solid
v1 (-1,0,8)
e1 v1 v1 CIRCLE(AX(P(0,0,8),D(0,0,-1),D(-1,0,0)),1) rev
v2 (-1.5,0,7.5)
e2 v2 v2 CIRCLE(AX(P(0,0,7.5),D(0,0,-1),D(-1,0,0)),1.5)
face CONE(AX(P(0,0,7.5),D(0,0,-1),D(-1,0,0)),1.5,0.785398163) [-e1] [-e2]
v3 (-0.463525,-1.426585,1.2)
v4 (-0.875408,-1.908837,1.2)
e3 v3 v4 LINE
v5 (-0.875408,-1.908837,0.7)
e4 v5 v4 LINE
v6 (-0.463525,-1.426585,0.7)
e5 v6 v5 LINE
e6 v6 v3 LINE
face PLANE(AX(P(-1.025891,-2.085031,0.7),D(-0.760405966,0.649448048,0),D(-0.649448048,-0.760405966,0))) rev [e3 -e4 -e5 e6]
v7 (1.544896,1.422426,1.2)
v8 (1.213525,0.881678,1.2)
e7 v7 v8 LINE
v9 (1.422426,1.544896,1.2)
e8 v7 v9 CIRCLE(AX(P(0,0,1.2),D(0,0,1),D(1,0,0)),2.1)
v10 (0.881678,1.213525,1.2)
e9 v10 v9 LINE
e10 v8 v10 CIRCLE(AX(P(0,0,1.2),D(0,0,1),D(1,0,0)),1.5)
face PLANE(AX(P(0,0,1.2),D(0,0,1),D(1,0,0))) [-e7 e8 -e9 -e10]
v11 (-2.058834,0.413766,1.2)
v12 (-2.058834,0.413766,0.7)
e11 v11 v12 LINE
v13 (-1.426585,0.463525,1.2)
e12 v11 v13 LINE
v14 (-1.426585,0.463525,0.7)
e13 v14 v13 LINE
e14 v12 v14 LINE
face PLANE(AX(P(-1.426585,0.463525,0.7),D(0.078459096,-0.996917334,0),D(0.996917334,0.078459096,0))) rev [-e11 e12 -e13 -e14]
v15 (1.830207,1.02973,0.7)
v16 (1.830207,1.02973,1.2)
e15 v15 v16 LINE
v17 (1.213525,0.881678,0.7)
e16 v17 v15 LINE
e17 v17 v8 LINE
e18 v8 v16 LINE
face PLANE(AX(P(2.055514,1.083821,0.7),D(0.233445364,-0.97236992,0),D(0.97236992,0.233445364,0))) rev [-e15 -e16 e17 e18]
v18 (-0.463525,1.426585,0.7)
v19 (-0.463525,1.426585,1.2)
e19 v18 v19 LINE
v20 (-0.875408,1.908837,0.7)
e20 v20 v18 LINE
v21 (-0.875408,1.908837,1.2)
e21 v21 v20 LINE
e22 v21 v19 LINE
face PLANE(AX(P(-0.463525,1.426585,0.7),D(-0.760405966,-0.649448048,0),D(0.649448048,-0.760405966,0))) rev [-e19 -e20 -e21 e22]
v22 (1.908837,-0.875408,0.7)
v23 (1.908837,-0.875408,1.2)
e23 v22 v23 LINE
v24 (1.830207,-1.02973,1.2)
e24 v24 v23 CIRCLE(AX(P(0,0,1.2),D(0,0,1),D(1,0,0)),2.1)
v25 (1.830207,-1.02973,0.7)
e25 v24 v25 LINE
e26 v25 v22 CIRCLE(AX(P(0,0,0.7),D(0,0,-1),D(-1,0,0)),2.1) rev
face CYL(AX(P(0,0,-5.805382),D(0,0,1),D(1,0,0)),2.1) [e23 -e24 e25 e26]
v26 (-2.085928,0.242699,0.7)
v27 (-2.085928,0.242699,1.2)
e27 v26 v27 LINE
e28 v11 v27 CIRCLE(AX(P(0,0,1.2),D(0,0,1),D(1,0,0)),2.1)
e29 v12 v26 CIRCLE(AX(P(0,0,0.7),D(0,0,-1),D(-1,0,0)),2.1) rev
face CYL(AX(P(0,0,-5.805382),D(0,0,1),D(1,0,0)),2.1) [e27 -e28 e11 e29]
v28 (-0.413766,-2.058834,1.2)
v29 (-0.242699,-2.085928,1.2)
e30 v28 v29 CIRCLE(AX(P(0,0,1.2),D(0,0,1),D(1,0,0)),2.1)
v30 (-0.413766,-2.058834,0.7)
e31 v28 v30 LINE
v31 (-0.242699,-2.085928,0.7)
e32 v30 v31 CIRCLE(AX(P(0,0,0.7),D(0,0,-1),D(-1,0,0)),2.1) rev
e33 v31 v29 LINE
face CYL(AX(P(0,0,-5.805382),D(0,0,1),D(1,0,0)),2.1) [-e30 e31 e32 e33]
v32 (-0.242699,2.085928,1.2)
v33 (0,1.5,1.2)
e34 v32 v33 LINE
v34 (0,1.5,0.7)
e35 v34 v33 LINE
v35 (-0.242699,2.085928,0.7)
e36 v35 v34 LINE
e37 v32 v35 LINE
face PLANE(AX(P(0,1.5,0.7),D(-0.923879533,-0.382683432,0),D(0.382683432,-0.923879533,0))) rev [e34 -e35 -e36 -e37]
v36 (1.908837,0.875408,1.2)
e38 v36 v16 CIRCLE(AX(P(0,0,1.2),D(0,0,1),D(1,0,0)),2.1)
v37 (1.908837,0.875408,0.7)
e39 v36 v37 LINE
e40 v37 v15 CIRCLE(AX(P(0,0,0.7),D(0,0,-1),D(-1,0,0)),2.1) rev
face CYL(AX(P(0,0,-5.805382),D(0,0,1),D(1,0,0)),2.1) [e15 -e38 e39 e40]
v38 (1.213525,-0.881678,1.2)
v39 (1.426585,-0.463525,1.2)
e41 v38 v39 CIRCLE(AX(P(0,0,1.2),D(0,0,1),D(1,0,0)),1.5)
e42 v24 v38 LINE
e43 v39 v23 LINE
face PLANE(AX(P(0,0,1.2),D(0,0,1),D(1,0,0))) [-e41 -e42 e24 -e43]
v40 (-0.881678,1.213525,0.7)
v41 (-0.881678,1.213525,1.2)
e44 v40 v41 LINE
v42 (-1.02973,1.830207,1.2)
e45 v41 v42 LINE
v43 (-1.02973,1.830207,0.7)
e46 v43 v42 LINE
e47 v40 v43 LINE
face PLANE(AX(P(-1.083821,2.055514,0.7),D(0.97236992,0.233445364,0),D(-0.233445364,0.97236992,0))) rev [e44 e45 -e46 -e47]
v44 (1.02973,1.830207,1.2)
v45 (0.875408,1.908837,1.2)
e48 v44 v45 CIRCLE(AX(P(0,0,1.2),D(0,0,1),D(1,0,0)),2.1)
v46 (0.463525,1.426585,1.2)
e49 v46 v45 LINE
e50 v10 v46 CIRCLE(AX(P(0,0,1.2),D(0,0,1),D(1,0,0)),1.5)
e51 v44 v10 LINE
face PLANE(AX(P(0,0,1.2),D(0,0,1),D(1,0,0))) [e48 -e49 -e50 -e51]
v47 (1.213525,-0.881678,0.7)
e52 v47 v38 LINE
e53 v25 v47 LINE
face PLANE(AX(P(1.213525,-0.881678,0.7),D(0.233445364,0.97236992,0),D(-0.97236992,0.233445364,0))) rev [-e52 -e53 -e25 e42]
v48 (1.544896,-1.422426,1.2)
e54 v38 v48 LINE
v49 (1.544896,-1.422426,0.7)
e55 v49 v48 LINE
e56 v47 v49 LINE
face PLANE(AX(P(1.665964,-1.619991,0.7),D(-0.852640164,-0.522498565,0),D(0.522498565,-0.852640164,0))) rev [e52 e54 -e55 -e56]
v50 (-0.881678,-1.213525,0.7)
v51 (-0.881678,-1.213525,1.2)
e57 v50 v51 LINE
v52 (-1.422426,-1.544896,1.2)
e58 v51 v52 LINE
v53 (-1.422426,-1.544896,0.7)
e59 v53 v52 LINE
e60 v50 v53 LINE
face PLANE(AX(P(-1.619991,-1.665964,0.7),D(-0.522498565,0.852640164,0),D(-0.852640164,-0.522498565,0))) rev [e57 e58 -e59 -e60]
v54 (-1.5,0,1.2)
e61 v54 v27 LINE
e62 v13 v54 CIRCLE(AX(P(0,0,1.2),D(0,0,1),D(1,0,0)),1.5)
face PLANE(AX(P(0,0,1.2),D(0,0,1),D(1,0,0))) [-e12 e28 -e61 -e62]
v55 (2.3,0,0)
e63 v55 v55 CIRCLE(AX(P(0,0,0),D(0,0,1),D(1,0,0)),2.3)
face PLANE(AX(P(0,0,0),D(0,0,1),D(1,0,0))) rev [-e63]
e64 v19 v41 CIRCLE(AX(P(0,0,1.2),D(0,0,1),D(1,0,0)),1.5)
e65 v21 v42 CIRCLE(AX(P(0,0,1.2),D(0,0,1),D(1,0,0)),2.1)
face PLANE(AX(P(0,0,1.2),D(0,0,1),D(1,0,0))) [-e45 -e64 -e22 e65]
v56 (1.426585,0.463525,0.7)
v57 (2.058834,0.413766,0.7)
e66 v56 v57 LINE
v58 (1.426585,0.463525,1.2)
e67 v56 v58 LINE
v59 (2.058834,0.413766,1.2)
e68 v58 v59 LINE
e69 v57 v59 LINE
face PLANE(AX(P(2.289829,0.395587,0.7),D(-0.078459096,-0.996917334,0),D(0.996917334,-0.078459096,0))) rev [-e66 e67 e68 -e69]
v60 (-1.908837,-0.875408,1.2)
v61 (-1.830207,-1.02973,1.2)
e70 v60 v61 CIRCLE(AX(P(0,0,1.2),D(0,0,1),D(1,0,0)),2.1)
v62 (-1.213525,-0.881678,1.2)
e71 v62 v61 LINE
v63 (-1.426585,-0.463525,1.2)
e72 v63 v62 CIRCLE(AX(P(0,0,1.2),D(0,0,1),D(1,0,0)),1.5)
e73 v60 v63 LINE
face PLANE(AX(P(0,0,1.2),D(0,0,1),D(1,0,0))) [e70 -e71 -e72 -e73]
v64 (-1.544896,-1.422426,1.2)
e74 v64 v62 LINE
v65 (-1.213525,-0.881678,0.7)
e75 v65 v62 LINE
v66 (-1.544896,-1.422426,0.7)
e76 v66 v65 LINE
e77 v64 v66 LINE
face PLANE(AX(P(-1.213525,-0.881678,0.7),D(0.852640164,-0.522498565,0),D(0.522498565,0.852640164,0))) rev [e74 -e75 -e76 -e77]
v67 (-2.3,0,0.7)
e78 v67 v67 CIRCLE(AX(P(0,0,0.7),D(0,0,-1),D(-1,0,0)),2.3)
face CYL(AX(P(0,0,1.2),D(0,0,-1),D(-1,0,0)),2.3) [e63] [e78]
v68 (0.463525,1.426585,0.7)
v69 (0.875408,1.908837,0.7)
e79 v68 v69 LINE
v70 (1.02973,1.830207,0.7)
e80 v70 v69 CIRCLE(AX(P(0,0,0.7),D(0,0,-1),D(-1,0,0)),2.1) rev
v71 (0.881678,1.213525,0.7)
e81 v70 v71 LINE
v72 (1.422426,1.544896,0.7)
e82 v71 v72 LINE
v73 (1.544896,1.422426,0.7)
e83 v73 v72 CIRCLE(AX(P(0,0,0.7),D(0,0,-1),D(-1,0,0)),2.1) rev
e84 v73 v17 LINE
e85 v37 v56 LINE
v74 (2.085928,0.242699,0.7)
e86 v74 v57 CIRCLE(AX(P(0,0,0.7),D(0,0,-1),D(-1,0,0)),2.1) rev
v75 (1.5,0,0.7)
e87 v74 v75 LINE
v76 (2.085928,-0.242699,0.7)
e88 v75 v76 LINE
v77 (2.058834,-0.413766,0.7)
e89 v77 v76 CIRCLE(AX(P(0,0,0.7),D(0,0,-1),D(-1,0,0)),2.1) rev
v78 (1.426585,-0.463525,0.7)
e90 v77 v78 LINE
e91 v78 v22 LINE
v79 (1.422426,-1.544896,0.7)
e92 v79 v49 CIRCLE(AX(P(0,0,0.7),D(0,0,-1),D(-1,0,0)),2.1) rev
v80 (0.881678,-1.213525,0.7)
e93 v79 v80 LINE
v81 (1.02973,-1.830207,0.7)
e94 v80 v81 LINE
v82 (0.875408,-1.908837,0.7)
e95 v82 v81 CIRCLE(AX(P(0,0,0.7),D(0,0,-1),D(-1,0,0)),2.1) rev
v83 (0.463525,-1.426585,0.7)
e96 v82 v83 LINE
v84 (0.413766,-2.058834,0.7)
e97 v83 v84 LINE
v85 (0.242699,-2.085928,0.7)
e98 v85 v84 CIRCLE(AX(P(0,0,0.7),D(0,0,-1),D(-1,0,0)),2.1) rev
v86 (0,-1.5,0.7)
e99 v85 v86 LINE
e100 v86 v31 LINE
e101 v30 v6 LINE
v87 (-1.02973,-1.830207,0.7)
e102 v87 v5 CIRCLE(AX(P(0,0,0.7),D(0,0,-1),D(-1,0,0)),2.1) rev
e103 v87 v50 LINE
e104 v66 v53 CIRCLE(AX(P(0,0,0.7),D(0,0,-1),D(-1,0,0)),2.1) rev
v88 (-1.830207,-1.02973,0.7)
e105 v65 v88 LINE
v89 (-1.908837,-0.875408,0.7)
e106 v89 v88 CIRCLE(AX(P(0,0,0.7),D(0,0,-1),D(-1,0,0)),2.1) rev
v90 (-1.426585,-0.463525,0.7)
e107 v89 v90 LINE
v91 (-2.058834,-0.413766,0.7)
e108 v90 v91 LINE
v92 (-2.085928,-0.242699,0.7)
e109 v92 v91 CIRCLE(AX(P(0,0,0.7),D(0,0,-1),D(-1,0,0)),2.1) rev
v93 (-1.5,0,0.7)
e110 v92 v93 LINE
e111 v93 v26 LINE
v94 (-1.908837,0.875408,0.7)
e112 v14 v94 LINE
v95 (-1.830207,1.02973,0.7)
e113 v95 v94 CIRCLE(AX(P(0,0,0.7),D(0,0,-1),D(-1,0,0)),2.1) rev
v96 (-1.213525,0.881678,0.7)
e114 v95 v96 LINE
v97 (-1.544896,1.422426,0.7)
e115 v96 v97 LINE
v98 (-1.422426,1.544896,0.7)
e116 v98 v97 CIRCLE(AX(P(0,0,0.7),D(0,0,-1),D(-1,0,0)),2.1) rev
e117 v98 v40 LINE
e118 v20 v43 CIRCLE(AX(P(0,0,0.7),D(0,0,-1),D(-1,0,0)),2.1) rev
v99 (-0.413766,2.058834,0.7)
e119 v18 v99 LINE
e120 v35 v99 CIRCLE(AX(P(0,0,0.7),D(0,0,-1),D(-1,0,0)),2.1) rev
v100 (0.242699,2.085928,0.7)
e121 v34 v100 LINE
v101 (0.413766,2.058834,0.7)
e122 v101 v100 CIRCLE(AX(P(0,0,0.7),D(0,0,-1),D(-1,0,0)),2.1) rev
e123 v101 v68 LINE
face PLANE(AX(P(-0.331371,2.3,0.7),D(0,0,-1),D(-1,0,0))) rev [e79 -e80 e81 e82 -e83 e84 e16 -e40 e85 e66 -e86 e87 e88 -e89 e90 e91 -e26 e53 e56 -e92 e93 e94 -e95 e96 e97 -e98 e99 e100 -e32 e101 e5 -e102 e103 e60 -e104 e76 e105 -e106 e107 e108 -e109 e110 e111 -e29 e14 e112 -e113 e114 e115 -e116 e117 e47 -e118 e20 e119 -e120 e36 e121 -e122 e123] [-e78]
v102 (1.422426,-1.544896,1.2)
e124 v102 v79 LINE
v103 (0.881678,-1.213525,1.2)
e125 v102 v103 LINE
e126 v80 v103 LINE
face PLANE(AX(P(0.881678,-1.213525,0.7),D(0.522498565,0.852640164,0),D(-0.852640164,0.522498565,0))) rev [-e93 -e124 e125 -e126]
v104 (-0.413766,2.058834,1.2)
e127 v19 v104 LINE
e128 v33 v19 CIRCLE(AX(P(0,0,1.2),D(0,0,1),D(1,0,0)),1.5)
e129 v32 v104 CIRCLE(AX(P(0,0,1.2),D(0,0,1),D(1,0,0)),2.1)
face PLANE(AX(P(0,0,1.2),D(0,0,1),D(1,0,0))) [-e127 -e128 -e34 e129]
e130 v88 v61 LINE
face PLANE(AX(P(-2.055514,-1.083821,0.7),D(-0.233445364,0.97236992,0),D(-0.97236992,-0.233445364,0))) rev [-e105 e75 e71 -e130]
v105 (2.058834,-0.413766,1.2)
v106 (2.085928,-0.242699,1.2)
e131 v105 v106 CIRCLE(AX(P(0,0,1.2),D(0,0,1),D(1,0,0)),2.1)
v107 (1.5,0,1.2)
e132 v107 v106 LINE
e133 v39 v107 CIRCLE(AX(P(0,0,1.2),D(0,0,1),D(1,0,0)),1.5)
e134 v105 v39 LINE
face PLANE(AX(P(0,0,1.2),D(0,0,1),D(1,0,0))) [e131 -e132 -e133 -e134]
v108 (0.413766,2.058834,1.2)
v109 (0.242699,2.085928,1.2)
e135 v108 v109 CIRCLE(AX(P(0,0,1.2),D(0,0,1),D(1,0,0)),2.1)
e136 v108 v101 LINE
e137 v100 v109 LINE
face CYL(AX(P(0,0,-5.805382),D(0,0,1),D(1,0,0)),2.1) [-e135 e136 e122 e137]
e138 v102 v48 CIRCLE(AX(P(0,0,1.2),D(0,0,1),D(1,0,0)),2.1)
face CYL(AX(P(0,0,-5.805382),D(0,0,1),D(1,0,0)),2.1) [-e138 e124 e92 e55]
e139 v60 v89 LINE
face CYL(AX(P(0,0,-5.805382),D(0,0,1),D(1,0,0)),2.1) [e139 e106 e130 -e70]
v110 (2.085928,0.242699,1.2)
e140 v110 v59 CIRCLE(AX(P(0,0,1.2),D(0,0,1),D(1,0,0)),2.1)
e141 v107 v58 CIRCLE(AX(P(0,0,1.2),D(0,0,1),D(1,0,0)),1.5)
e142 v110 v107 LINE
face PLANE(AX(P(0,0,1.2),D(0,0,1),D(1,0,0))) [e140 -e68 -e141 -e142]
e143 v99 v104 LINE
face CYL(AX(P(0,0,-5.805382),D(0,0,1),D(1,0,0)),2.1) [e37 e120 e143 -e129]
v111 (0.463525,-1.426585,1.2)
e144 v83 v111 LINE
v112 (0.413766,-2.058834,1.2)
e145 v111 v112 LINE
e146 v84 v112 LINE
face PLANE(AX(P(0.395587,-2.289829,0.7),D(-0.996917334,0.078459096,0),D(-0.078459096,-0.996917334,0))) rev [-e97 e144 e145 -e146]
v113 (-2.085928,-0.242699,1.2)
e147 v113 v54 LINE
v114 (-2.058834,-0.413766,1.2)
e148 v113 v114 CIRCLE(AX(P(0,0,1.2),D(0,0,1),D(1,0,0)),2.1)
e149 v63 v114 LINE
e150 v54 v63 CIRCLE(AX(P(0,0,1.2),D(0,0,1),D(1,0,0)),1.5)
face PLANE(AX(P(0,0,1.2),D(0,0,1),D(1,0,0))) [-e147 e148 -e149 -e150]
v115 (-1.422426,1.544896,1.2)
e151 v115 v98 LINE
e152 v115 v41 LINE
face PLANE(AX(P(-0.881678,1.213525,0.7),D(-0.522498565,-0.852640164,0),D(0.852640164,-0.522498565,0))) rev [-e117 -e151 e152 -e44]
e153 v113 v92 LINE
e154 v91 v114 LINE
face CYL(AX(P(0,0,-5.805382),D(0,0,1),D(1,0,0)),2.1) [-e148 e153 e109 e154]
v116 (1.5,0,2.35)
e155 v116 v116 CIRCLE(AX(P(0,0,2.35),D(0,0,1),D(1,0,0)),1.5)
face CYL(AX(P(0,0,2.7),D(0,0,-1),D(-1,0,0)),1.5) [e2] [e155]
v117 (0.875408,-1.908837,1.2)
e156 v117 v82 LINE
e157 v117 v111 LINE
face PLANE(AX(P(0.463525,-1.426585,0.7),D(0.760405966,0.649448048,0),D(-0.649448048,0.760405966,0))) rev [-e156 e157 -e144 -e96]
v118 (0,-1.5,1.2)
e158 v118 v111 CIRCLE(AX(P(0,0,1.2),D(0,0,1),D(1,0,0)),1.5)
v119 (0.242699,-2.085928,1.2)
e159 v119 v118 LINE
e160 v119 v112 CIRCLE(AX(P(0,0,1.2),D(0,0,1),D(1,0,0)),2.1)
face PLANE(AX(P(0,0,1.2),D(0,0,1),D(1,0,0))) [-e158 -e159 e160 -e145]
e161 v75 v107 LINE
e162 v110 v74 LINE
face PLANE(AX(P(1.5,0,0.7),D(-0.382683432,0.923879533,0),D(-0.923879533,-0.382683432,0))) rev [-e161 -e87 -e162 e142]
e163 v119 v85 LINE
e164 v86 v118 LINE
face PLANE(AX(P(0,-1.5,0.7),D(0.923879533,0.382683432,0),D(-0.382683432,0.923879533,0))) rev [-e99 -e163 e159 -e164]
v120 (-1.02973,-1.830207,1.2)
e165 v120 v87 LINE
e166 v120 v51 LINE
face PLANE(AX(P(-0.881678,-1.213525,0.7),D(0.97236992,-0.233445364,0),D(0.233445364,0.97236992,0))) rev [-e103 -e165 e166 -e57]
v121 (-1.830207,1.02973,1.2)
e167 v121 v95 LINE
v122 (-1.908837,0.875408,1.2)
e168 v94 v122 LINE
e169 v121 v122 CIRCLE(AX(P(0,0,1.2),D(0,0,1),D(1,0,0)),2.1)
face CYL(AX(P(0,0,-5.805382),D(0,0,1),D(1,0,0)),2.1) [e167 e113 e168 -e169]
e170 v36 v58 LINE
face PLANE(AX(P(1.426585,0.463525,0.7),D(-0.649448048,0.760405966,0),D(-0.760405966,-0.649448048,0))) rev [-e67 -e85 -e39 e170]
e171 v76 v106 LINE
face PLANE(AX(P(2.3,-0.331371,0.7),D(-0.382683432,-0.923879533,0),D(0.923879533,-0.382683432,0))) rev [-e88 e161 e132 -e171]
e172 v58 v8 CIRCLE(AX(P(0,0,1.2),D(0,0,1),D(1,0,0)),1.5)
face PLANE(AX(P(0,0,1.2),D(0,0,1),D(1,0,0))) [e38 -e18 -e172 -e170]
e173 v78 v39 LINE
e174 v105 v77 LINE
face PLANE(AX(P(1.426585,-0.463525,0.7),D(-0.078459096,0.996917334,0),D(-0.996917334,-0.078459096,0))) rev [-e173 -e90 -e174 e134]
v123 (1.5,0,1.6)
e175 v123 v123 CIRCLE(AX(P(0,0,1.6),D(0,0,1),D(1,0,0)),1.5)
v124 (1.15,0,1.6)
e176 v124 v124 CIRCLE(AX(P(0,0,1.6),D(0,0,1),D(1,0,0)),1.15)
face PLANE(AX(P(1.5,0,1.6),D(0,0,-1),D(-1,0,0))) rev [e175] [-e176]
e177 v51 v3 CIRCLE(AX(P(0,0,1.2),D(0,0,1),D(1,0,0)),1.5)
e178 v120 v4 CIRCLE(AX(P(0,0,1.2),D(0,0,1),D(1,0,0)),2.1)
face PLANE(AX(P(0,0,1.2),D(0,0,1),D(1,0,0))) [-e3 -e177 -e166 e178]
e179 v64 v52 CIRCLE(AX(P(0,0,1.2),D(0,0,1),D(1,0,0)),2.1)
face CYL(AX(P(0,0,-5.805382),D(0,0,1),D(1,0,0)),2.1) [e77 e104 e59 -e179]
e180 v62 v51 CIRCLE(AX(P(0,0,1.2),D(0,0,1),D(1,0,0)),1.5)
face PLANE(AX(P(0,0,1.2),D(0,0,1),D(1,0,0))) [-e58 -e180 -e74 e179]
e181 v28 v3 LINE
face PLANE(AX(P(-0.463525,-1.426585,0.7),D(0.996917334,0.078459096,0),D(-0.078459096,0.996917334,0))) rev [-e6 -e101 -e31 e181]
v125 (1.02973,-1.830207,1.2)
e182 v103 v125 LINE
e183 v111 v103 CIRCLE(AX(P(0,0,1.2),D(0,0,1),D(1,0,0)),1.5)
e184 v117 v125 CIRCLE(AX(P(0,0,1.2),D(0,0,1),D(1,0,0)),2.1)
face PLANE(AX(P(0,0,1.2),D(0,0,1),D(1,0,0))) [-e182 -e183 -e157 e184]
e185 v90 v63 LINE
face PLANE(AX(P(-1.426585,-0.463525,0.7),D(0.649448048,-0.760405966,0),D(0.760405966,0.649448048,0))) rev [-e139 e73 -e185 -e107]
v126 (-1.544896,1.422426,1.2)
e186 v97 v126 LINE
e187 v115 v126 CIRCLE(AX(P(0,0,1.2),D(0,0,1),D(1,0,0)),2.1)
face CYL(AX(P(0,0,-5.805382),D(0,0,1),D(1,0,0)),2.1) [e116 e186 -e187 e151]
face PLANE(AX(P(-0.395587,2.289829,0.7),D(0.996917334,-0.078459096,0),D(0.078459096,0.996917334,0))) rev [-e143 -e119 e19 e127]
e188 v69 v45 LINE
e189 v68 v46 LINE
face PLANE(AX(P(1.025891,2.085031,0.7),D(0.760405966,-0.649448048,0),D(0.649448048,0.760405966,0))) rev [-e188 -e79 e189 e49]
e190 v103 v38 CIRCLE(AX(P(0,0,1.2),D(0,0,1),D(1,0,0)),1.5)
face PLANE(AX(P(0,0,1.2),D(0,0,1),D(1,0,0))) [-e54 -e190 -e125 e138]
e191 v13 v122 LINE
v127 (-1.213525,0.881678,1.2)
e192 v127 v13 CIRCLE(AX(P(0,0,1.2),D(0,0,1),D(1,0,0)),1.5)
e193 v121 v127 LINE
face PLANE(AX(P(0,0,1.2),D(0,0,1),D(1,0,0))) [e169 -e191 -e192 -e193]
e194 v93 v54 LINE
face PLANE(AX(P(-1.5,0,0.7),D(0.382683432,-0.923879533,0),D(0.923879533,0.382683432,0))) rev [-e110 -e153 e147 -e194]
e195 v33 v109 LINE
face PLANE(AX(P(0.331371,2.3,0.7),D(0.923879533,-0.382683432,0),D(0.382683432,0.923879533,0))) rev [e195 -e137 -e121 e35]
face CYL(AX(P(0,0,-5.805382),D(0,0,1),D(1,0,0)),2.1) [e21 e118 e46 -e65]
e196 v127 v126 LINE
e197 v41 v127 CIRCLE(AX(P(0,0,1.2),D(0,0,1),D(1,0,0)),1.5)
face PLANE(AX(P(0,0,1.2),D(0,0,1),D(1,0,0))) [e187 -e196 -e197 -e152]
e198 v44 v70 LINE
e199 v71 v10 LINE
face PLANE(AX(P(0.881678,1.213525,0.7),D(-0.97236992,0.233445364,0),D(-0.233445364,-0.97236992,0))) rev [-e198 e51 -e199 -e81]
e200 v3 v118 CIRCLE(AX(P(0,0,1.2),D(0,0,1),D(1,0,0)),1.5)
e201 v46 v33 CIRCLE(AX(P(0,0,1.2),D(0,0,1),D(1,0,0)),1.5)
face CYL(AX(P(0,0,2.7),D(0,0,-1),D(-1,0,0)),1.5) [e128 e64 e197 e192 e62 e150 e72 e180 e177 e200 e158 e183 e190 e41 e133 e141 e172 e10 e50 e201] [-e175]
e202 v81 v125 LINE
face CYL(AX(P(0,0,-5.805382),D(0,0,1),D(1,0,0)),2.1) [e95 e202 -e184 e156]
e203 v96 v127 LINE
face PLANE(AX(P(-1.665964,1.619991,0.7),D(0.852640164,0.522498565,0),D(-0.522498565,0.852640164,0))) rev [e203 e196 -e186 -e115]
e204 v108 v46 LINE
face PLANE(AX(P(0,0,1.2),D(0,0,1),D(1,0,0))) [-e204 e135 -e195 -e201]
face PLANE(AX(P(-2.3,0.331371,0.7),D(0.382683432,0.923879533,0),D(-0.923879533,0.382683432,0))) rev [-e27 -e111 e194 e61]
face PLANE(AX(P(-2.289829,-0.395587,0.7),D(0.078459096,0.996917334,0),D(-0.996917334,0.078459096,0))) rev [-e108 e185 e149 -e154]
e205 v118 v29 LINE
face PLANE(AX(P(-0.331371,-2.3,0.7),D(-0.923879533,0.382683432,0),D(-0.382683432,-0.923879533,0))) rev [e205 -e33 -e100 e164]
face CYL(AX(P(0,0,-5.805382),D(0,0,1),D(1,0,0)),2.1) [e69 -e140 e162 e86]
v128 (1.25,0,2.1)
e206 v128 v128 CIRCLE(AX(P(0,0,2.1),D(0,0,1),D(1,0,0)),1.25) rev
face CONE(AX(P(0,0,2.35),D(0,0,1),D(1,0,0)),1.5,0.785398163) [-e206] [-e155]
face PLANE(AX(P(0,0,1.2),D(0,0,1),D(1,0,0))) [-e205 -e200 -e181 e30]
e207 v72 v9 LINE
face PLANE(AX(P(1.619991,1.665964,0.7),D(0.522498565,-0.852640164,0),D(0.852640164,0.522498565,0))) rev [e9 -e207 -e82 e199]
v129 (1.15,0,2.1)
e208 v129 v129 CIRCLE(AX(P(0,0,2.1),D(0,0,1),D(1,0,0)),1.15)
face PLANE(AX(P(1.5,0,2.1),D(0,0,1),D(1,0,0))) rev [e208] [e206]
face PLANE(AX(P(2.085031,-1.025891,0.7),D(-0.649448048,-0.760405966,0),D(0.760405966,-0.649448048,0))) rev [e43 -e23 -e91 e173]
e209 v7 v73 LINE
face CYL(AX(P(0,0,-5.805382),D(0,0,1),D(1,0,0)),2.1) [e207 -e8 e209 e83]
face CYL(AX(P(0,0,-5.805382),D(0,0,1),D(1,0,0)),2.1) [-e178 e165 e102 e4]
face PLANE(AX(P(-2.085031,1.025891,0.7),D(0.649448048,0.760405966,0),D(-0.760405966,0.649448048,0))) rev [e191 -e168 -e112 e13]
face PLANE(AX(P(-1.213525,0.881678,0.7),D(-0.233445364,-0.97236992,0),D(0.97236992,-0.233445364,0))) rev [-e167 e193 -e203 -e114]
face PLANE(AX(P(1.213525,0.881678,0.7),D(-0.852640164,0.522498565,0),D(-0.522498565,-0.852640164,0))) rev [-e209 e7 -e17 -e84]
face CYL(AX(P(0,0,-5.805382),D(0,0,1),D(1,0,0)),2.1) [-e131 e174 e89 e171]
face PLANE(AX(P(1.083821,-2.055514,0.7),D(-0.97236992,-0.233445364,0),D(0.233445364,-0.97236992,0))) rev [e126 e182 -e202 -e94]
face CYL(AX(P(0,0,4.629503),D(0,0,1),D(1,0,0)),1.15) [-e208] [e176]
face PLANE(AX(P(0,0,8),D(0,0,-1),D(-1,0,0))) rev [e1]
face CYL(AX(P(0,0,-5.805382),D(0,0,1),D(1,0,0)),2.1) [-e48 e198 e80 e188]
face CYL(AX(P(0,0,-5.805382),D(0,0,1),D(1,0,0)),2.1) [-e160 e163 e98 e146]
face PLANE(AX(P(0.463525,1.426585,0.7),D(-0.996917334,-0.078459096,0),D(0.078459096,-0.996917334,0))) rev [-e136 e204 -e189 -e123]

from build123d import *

# Parameters (mm, degrees)
SKETCH_1_R               = 2.3
EXTRUDE_1_DEPTH          = 1.2
SKETCH_2_R               = 1.5
EXTRUDE_2_DEPTH          = 1.5
CUT_EXTRUDE_1_DEPTH      = 0.5
PATTERN_CIRCULAR_1_COUNT = 20
SKETCH_4_W               = 0.35
SKETCH_4_H               = 0.5
SKETCH_6_W               = 5.3
SKETCH_6_H               = 1.5
CHAMFER_2_SIZE           = 0.5
CUT_EXTRUDE_START        = -0.5
SKETCH_7_R               = 2.3
SKETCH_7_R_2             = 2.1
CUT_EXTRUDE_2_DEPTH      = 0.5


with BuildPart() as part:
    # Эскиз1 → Вытянуть1 (new body)
    with BuildSketch(Plane.XY):
        Circle(SKETCH_1_R)
    extrude(amount=EXTRUDE_1_DEPTH)

    # Эскиз2 → Вытянуть2 (add)
    with BuildSketch(Plane.XY.offset(1.2)):
        Circle(SKETCH_2_R)
    extrude(amount=EXTRUDE_2_DEPTH)

    # Эскиз3 → Вырез-Вытянуть1 (cut)
    with BuildSketch(Plane.XY.offset(1.2)):
        Polygon((-0.33137085, 2.3), (0.33137085, 2.3), (0, 1.5), align=None)
    cut_extrude_1 = extrude(amount=-CUT_EXTRUDE_1_DEPTH, mode=Mode.SUBTRACT)

    # Круговой массив1: Вырез-Вытянуть1 ×20 about axis
    pattern_circular_1_axis = Axis((0, 0, 0), (0, 0, 1))
    for i in range(1, PATTERN_CIRCULAR_1_COUNT):
        add(cut_extrude_1.rotate(pattern_circular_1_axis, i * 360 / PATTERN_CIRCULAR_1_COUNT), mode=Mode.SUBTRACT)

    # Эскиз4 → Вырез-Повернуть1 (revolve, cut)
    with BuildSketch(Plane(origin=(0, 0, 0), x_dir=(1, 0, 0), z_dir=(0, 1, 0))):
        with Locations((1.325, -1.85)):
            Rectangle(SKETCH_4_W, SKETCH_4_H)
    revolve(axis=Axis((0, 0, 10.642619983), (0, 0, -1)), mode=Mode.SUBTRACT)

    # Эскиз6 → Повернуть1 (revolve)
    with BuildSketch(Plane(origin=(0, 0, 0), x_dir=(0, 0, -1), z_dir=(1, 0, 0)), mode=Mode.PRIVATE) as revolve_1_sk:
        with Locations((-5.35, -0.75)):
            Rectangle(SKETCH_6_W, SKETCH_6_H)
    revolve(revolve_1_sk.sketch.rotate(Axis((0, 0, 2.7), (0, 0, 1)), 278.047567557), axis=Axis((0, 0, 2.7), (0, 0, 1)))

    # Фаска2
    # the kernel refuses this chamfer: 0.5 mm, written as the material it takes off along each edge
    with BuildSketch(Plane(origin=(0, 0, 8), x_dir=(-0.9901521845161062, -0.1399951838385265, 0), z_dir=(-0.1399951838385265, 0.9901521845161062, 0))) as chamfer_2_piece_1:
        Polygon((1.5, -CHAMFER_2_SIZE), (1.5 - CHAMFER_2_SIZE, 0), (1.5, 0), align=None)
    revolve(axis=Axis((0, 0, 8), (0, 0, 1)), mode=Mode.SUBTRACT)

    # Эскиз7 → Вырез-Вытянуть2 (cut)
    with BuildSketch(Plane.XY.offset(1.2).offset(CUT_EXTRUDE_START)):
        with Locations(Location((0, 0, 0), (0, 0, 180))):
            Circle(SKETCH_7_R)
        Circle(SKETCH_7_R_2, mode=Mode.SUBTRACT)
    extrude(amount=CUT_EXTRUDE_2_DEPTH, mode=Mode.SUBTRACT)

    # Фаска3
    # the kernel refuses this chamfer: 0.25 mm, written as the material it takes off along each edge
    with BuildSketch(Plane(origin=(0, 0, 2.1), x_dir=(1, 0, 0), z_dir=(0, 1, 0))) as chamfer_3_piece_1:
        with BuildLine():
            Line((1.242928932, 0.007071068), (1.507071068, -0.257071068))
            Line((1.507071068, -0.257071068), (1.512071068, -0.257071068))
            ThreePointArc((1.512071068, -0.257071068), (1.505, -0.128535534), (1.505, 0))
            Line((1.505, 0), (1.5, 0.005))
            ThreePointArc((1.5, 0.005), (1.371464466, 0.005), (1.242928932, 0.012071068))
            Line((1.242928932, 0.012071068), (1.242928932, 0.007071068))
        make_face()
    revolve(axis=Axis((0, 0, 2.1), (0, 0, -1)), mode=Mode.SUBTRACT)


solid = part.part
